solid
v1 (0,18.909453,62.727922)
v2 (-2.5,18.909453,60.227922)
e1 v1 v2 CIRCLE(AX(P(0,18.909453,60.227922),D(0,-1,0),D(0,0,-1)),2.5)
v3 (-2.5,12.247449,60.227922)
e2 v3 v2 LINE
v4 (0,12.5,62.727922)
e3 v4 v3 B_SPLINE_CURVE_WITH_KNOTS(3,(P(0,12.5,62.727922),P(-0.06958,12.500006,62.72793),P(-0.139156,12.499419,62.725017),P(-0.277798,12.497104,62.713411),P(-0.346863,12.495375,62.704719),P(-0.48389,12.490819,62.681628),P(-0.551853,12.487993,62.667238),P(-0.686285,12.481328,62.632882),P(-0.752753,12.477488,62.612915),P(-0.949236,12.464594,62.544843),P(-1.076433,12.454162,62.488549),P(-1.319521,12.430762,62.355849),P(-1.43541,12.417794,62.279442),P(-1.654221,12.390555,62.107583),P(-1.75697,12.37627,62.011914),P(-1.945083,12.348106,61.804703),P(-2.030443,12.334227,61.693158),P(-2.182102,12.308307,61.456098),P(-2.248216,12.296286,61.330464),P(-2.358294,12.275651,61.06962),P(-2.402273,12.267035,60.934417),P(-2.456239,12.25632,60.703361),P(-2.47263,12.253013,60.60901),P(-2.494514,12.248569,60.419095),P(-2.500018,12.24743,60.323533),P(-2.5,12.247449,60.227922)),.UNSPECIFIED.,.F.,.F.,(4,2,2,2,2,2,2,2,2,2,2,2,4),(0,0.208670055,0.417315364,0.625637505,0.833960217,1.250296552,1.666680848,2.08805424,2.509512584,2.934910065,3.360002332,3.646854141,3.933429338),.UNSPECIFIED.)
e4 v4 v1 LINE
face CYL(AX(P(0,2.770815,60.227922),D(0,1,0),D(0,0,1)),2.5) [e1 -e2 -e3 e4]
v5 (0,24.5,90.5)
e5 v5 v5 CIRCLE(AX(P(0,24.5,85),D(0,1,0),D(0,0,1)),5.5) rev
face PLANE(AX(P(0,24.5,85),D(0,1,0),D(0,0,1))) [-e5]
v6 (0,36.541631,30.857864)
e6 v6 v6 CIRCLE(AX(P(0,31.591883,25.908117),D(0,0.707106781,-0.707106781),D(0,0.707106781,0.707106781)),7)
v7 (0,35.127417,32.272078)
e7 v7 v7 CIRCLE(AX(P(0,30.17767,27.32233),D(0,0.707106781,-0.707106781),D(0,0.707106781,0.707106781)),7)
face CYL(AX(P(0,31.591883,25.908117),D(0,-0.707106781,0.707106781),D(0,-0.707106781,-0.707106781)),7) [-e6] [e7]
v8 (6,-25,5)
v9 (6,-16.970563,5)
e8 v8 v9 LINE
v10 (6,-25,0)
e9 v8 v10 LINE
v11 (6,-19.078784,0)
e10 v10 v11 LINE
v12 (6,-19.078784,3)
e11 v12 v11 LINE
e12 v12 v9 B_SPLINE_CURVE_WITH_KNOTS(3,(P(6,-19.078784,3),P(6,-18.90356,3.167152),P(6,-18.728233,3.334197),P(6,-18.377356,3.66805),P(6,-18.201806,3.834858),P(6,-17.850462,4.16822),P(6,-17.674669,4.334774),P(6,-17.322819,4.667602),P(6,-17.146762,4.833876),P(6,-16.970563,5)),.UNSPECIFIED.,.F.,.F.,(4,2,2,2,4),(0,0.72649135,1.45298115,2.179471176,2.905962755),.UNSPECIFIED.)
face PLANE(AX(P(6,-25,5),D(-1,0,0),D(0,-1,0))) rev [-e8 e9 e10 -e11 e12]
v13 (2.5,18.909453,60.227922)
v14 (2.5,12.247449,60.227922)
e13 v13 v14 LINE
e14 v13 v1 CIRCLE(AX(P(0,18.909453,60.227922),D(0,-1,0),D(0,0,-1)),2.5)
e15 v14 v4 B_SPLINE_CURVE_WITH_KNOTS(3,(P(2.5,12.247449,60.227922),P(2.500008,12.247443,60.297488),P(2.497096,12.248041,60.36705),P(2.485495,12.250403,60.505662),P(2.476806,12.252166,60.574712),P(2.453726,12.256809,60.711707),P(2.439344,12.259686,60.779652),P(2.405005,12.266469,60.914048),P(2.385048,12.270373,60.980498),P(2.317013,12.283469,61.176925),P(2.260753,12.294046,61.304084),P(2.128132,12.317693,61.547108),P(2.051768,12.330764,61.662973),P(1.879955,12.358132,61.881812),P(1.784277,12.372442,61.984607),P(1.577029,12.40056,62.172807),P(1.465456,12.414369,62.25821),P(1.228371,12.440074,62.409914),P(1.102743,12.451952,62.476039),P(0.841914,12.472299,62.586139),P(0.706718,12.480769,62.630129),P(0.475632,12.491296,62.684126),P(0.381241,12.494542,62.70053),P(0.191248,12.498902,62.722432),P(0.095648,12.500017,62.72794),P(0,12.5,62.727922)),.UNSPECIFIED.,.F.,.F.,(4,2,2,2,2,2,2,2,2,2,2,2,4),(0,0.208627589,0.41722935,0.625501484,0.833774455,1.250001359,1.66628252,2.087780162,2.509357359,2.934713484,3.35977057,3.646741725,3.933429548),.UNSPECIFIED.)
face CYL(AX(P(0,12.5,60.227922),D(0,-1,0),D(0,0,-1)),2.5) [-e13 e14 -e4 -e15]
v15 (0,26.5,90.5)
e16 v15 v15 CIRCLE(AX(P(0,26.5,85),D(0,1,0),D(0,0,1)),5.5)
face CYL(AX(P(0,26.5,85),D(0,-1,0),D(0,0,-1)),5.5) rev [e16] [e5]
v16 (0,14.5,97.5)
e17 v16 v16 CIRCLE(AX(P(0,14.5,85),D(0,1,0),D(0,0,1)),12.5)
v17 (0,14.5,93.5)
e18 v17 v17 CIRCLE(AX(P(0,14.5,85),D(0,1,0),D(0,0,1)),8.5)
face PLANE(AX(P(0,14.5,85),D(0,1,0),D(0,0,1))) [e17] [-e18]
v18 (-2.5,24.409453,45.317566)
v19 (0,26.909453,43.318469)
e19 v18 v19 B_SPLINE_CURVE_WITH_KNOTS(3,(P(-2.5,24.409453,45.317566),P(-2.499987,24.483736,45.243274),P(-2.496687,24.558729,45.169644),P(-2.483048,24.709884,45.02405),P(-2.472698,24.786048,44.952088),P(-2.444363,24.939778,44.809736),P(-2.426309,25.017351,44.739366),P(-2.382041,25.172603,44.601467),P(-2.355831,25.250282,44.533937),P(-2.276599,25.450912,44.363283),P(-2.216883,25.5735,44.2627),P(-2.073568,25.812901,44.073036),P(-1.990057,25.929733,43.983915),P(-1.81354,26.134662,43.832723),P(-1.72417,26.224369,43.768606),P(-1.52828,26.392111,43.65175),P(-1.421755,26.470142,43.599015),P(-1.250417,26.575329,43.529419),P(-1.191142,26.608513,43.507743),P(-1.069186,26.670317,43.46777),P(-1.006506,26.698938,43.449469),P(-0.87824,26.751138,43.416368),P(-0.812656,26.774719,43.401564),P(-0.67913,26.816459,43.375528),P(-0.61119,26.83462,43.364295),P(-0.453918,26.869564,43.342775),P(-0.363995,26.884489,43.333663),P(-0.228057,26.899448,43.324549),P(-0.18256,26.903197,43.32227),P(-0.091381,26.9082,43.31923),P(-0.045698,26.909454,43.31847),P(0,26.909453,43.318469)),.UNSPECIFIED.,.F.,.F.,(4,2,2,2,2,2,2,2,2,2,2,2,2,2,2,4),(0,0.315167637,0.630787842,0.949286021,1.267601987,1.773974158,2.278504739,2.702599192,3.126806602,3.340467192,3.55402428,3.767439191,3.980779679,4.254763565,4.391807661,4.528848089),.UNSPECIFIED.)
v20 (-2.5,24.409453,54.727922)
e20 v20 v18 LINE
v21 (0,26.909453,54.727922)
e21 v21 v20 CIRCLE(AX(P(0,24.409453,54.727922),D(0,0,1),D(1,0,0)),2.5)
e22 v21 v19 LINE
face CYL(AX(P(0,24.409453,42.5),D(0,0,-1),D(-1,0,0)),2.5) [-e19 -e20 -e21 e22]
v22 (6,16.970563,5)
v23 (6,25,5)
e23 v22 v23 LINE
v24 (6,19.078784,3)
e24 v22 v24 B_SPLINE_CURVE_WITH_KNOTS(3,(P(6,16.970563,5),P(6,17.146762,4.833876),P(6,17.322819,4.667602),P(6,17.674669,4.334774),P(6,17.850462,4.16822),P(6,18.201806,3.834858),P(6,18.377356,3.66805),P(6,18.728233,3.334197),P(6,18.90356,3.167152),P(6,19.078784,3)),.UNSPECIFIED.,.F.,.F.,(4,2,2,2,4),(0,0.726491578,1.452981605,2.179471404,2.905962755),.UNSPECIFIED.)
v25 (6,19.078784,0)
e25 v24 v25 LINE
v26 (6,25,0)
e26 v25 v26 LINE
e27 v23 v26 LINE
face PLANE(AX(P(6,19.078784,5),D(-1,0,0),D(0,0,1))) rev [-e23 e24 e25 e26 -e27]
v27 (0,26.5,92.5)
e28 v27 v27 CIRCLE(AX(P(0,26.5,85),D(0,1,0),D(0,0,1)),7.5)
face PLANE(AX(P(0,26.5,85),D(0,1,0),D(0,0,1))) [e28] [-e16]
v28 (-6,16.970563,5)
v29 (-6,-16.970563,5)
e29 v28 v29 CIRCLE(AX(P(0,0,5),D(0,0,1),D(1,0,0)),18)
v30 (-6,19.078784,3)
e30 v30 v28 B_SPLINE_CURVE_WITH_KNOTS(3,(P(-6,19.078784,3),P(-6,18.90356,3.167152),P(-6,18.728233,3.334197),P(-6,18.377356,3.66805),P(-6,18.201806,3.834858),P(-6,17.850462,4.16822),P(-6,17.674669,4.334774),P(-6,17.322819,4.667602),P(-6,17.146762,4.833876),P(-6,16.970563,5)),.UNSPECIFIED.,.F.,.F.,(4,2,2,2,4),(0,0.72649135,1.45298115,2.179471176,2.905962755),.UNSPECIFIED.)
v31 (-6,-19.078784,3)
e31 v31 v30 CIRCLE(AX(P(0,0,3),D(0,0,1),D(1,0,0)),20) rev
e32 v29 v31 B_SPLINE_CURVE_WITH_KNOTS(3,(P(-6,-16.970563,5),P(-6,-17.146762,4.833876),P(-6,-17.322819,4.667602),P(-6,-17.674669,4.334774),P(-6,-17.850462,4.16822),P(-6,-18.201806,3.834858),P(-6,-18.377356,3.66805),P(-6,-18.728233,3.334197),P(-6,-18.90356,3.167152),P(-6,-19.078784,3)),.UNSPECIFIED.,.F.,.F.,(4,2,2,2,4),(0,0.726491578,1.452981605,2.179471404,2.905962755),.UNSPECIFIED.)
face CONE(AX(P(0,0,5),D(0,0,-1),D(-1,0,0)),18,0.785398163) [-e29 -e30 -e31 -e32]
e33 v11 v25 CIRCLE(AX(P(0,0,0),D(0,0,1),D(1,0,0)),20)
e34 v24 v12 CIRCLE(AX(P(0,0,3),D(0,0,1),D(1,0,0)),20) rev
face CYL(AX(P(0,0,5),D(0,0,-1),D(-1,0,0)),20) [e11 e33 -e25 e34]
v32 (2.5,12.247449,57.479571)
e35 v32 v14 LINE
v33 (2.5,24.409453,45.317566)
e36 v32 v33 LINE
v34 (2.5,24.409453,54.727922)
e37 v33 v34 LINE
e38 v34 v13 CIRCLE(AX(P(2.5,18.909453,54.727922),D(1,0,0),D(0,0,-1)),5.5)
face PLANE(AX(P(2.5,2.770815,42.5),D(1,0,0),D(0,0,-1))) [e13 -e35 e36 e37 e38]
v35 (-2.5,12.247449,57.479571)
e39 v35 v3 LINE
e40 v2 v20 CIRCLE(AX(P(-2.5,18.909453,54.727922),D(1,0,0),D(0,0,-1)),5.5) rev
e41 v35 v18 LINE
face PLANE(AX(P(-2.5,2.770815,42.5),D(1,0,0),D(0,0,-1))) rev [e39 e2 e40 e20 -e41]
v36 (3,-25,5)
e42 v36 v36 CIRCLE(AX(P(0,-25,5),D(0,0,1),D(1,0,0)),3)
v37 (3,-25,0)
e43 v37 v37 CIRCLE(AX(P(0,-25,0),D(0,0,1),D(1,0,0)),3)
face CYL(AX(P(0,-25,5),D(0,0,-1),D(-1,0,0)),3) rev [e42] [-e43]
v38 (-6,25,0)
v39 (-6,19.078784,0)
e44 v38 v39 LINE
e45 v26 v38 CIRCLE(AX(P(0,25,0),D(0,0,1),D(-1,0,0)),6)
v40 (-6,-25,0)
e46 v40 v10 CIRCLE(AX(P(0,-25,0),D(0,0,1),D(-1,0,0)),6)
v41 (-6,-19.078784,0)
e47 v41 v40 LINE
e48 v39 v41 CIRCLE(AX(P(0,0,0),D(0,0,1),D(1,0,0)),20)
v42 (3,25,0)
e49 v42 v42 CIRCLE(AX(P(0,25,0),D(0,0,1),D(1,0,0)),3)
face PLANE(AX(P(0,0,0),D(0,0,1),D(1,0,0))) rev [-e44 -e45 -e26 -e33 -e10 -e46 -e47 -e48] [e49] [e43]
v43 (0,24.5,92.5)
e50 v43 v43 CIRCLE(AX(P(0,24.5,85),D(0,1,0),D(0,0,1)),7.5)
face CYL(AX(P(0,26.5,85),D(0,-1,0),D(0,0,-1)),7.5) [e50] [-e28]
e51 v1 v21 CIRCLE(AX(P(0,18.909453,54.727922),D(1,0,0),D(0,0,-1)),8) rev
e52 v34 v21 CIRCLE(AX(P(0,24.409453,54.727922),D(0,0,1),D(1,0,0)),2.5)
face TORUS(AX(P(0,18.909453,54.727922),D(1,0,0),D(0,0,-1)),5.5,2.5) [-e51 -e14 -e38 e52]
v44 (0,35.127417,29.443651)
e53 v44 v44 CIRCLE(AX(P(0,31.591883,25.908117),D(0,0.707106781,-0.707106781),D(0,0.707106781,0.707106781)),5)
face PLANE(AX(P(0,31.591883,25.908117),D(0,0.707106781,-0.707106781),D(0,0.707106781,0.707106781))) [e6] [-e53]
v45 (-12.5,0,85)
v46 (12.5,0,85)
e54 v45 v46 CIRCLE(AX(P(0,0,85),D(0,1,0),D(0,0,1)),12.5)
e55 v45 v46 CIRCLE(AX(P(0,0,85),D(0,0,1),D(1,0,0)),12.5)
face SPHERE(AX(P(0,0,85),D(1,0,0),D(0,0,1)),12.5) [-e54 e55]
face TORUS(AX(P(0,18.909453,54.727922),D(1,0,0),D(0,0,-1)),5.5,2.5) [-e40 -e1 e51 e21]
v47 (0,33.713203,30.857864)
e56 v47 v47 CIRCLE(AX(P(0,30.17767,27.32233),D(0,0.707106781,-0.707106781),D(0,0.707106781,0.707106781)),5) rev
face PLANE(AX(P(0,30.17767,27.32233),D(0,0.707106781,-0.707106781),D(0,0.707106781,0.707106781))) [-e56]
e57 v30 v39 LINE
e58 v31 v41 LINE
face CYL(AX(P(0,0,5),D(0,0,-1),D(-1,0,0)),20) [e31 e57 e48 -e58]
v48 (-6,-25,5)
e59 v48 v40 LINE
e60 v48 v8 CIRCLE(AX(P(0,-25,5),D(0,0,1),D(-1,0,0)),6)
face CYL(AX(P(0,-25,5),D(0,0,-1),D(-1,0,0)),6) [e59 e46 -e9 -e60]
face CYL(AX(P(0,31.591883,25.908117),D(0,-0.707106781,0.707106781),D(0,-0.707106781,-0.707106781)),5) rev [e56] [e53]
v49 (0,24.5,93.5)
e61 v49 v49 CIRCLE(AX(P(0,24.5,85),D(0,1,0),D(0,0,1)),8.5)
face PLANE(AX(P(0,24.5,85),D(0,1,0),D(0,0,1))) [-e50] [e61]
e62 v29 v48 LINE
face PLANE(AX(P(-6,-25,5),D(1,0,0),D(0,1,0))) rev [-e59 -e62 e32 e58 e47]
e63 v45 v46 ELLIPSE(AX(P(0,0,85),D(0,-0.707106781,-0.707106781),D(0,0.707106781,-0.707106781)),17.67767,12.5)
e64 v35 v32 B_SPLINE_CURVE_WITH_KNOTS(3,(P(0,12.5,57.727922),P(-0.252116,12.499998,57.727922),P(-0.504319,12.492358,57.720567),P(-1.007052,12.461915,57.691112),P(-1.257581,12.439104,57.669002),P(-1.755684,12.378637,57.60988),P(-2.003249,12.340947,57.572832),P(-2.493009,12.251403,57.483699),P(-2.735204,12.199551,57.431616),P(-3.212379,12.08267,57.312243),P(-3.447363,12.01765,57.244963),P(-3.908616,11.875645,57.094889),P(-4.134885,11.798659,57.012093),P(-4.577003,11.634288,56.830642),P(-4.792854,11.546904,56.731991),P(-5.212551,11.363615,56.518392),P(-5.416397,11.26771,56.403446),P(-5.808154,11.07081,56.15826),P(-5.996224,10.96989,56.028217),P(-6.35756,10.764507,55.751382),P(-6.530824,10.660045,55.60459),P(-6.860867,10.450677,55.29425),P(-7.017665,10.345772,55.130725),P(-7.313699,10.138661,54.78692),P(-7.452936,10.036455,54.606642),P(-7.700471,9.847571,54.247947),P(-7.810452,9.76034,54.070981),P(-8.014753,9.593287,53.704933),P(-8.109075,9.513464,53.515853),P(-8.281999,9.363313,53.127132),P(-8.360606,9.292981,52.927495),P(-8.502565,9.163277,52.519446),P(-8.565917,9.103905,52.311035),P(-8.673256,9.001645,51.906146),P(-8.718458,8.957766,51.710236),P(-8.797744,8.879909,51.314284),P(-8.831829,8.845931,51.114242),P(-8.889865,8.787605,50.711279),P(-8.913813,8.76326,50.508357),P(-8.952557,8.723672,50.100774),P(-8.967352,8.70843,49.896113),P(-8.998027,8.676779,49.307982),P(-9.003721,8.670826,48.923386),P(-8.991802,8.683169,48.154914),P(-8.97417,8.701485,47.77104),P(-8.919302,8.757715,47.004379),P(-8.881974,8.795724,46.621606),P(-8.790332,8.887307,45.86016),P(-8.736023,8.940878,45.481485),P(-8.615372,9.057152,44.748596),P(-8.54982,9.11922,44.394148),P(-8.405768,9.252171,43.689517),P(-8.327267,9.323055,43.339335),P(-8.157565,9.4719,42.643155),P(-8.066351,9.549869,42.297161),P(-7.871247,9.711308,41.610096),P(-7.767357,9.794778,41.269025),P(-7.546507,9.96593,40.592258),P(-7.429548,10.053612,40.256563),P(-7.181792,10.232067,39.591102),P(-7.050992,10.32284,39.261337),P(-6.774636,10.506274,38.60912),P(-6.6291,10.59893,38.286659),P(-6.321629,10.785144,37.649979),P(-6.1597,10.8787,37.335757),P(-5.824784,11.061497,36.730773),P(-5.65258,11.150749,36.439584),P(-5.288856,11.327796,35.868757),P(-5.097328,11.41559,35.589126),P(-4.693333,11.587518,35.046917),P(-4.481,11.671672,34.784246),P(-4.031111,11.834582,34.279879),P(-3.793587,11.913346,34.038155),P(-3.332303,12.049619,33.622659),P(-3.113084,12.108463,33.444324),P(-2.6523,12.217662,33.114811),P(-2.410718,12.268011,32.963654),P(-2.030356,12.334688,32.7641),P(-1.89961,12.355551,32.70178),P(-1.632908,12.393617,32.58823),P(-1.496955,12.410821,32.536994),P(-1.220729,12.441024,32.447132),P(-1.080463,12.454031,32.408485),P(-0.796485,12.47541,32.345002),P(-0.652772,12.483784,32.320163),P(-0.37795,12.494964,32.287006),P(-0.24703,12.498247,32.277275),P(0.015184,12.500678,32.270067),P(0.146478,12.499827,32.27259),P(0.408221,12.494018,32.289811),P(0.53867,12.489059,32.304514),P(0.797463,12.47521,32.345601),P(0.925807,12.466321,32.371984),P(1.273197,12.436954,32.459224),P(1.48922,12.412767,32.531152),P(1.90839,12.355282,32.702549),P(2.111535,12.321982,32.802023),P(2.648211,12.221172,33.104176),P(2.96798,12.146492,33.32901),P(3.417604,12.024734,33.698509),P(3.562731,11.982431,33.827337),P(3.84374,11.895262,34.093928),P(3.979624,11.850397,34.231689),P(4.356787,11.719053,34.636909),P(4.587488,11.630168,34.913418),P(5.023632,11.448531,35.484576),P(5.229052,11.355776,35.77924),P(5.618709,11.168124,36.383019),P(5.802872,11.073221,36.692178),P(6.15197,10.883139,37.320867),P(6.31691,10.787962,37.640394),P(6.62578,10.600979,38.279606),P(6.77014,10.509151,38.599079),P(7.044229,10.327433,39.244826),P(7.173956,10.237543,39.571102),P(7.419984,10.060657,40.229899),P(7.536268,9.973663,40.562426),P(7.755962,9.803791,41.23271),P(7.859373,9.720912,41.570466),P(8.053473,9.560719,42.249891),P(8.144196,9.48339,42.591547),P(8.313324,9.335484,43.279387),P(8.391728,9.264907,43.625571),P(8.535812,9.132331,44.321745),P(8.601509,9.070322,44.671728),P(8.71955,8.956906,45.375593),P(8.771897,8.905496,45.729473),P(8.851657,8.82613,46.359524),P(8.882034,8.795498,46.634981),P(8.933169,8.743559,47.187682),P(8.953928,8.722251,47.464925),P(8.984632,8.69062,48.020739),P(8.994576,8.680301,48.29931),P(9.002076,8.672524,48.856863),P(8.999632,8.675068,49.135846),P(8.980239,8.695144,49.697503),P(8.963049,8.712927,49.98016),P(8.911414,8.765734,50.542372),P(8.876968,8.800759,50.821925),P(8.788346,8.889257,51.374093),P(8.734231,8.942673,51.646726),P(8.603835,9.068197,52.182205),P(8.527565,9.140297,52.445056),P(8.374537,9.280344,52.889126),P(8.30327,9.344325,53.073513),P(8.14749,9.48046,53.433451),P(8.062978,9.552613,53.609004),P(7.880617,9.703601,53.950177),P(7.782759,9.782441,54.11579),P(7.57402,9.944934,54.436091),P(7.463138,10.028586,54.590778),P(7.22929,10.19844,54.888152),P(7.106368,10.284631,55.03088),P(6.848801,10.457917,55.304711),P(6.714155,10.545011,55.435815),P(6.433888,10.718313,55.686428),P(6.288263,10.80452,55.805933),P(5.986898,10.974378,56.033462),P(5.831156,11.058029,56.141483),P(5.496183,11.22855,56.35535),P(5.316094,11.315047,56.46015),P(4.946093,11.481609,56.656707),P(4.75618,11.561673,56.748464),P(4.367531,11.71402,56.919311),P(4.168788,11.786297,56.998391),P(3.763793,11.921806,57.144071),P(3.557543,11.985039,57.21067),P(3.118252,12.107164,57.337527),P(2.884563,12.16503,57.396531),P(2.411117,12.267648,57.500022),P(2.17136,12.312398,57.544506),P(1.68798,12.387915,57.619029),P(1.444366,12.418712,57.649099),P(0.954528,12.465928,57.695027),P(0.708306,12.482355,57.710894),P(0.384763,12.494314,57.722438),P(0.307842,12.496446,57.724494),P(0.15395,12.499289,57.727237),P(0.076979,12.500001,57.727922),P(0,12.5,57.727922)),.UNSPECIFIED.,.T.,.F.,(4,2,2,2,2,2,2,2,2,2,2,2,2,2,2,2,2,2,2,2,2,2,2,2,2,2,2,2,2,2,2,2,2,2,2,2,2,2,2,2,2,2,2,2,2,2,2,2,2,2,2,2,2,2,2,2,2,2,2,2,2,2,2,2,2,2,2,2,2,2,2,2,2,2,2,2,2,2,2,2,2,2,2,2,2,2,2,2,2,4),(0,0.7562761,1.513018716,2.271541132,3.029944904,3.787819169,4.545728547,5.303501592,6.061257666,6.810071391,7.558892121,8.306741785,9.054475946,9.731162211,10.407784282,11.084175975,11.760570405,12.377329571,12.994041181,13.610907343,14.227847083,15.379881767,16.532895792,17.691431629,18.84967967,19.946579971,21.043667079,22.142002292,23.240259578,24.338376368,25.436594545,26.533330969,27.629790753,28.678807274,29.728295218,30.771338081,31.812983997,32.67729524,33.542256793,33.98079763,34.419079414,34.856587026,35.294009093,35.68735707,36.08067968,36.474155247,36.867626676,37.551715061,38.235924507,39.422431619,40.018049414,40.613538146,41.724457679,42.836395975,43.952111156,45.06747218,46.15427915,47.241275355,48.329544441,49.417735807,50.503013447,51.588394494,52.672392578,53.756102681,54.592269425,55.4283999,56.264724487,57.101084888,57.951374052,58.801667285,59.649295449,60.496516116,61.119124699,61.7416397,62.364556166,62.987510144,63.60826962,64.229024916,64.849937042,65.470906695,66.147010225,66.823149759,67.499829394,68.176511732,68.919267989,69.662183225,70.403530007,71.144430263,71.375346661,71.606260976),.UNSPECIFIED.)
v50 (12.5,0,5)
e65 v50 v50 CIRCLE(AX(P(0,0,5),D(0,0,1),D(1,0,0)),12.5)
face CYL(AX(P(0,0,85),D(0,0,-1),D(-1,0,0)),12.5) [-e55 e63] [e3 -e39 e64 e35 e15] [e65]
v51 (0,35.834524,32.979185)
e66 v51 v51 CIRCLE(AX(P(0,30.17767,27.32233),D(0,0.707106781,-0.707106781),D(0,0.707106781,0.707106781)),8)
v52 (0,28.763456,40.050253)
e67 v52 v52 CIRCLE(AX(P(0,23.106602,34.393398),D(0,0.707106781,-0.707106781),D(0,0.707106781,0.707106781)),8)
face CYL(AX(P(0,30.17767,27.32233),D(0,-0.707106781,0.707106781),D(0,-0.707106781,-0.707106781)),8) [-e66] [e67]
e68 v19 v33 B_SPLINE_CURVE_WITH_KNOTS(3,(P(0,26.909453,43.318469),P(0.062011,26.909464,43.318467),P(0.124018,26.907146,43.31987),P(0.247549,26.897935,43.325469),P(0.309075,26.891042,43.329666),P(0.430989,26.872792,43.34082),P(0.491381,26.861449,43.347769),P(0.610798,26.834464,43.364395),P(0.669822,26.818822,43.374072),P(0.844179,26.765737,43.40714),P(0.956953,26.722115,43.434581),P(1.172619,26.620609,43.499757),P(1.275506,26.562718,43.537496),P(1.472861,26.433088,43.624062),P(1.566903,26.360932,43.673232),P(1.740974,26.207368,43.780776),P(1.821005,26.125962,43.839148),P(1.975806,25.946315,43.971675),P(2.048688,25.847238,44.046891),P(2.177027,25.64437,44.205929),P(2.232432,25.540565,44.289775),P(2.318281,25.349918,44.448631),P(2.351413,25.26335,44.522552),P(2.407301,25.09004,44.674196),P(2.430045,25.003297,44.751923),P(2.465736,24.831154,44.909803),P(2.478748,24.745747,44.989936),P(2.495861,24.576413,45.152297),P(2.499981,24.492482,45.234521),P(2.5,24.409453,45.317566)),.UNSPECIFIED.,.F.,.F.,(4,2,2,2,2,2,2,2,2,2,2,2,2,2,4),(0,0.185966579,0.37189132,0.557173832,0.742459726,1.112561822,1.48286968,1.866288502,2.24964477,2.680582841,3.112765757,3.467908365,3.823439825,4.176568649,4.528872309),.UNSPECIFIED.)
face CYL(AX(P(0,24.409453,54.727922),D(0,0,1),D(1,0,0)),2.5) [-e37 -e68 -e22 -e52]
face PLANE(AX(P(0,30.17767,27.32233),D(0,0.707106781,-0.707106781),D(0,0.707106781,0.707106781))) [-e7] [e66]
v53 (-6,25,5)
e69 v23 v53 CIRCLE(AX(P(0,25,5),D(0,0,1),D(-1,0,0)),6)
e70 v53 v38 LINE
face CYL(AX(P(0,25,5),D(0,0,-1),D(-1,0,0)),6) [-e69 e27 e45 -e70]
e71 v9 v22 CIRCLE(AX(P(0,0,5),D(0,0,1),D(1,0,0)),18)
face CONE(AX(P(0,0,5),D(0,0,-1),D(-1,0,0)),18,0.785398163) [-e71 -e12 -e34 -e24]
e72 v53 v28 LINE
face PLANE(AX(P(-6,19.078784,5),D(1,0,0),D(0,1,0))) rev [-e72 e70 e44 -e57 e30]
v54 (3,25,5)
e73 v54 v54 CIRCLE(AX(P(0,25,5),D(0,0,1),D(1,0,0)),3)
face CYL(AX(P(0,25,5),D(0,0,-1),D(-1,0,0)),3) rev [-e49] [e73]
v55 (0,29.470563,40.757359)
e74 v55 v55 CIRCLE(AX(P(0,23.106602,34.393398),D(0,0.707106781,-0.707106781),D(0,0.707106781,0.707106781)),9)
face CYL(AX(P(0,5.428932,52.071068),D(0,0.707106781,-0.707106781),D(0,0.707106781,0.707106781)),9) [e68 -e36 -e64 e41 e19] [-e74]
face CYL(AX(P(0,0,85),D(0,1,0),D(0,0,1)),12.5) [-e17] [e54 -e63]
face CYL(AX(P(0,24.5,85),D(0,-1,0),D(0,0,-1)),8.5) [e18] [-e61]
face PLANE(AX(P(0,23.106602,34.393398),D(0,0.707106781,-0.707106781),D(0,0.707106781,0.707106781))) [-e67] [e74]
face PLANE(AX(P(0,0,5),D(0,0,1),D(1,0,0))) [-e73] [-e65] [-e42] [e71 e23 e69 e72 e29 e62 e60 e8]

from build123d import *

# Parameters (mm, degrees)
SZKIC1_R                         = 3
DODANIE_WYCI_GNI_CIE1_DEPTH      = 5
SFAZOWANIE1_SIZE                 = 2
SZKIC2_R                         = 12.5
DODANIE_WYCI_GNI_CIE2_DEPTH      = 80
DODANIE_WYCI_GNI_CIE3_DEPTH      = 15
DODANIE_WYCI_GNI_CIE3_DEPTH_BACK = 10
SZKIC5_R                         = 9
SZKIC6_R                         = 8
DODANIE_WYCI_GNI_CIE4_DEPTH      = 10
SZKIC7_R                         = 7
SZKIC7_R_2                       = 5
DODANIE_WYCI_GNI_CIE5_DEPTH      = 2
EBRO1_START                      = -2.5
EBRO1_DEPTH                      = 5
ZAOKR_GLENIE1_R                  = 2.5
DODANIE_WYCI_GNI_CIE6_DEPTH      = 2
DODANIE_WYCI_GNI_CIE6_DEPTH_BACK = 12.5
SZKIC9_R                         = 12.5
OBR_T1_ANGLE                     = 90
SZKIC11_R                        = 8.5
DODANIE_WYCI_GNI_CIE7_DEPTH      = 10
SZKIC12_R                        = 7.5
SZKIC12_R_2                      = 5.5
DODANIE_WYCI_GNI_CIE8_DEPTH      = 2


# Read off the part's stored shape, not the designer's step: Żebro1
with BuildPart() as part:
    # Szkic1 → Dodanie-wyciągnięcie1 (new body)
    with BuildSketch(Plane.XY):
        with BuildLine():
            Line((6, 19.078784028), (6, 25))
            ThreePointArc((6, 25), (0, 31), (-6, 25))
            Line((-6, 25), (-6, 19.078784028))
            ThreePointArc((-6, 19.078784028), (-20, 0), (-6, -19.078784028))
            Line((-6, -19.078784028), (-6, -25))
            ThreePointArc((-6, -25), (0, -31), (6, -25))
            Line((6, -25), (6, -19.078784028))
            ThreePointArc((6, -19.078784028), (20, 0), (6, 19.078784028))
        make_face()
        with Locations((0, 25)):
            Circle(SZKIC1_R, mode=Mode.SUBTRACT)
        with Locations((0, -25)):
            Circle(SZKIC1_R, mode=Mode.SUBTRACT)
    extrude(amount=DODANIE_WYCI_GNI_CIE1_DEPTH)

    # Sfazowanie1
    sfazowanie1_edges = [part.edges().sort_by_distance(p)[0] for p in [
        (20, 0, 5),
        (-20, 0, 5),
    ]]
    chamfer(sfazowanie1_edges, length=SFAZOWANIE1_SIZE)

    # Szkic2 → Dodanie-wyciągnięcie2 (add)
    with BuildSketch(Plane.XY.offset(5)):
        Circle(SZKIC2_R)
    extrude(amount=DODANIE_WYCI_GNI_CIE2_DEPTH)

    # Szkic5 → Dodanie-wyciągnięcie3 (add, two sides: drawn at the far end of the back side and taken through both)
    with BuildSketch(Plane(origin=(0, 12.5, 45), x_dir=(1, 0, 0), z_dir=(0, 0.7071067811865437, -0.7071067811865515)).offset(-DODANIE_WYCI_GNI_CIE3_DEPTH_BACK)):
        with Locations(Location((0, 0, 0), (0, 0, 270))):
            Circle(SZKIC5_R)
    extrude(amount=DODANIE_WYCI_GNI_CIE3_DEPTH + DODANIE_WYCI_GNI_CIE3_DEPTH_BACK)

    # Szkic6 → Dodanie-wyciągnięcie4 (add)
    with BuildSketch(Plane(origin=(0, -5.643398282, 5.643398282), x_dir=(1, 0, 0), z_dir=(0, 0.7071067811865437, -0.7071067811865513))):
        with Locations(Location((0, -40.658639918, 0), (0, 0, 270))):
            Circle(SZKIC6_R)
    extrude(amount=DODANIE_WYCI_GNI_CIE4_DEPTH)

    # Szkic7 → Dodanie-wyciągnięcie5 (add)
    with BuildSketch(Plane(origin=(0, 1.42766953, -1.42766953), x_dir=(1, 0, 0), z_dir=(0, 0.7071067811865437, -0.7071067811865515))):
        with Locations(Location((0, -40.658639918, 0), (0, 0, 270))):
            Circle(SZKIC7_R)
        with Locations(Location((0, -40.658639918, 0), (0, 0, 270))):
            Circle(SZKIC7_R_2, mode=Mode.SUBTRACT)
    extrude(amount=DODANIE_WYCI_GNI_CIE5_DEPTH)

    # Żebro1 outline → Żebro1 (add)
    with BuildSketch(Plane(origin=(0, 0, 0), x_dir=(0, 0, -1), z_dir=(1, 0, 0)).offset(EBRO1_START)):
        with BuildLine():
            Line((-62.727922061, 18.909453225), (-62.727922061, 12))
            Line((-62.727922061, 12), (-42, 12))
            Line((-42, 12), (-42, 26.909453225))
            Line((-42, 26.909453225), (-54.727922061, 26.909453225))
            ThreePointArc((-54.727922061, 26.909453225), (-60.384776311, 24.566307475), (-62.727922061, 18.909453225))
        make_face()
    extrude(amount=EBRO1_DEPTH)

    # Zaokrąglenie1
    zaokr_glenie1_edges = [part.edges().sort_by_distance(p)[0] for p in [
        (-2.5, 15.578450969, 62.727922061),
        (-2.5, 26.909453225, 48.772744048),
        (2.5, 15.578450969, 62.727922061),
        (2.5, 24.566307475, 60.384776311),
        (-2.5, 24.566307475, 60.384776311),
        (2.5, 26.909453225, 48.772744048),
    ]]
    fillet(zaokr_glenie1_edges, radius=ZAOKR_GLENIE1_R - 0.0001)  # a hair under: the kernel refuses the full size

    # Szkic9 → Dodanie-wyciągnięcie6 (add, two sides: drawn at the far end of the back side and taken through both)
    with BuildSketch(Plane(origin=(0, 12.5, 0), x_dir=(1, 0, 0), z_dir=(0, 1, 0)).offset(-DODANIE_WYCI_GNI_CIE6_DEPTH_BACK)):
        with Locations(Location((0, -85, 0), (0, 0, 270))):
            Circle(SZKIC9_R)
    extrude(amount=DODANIE_WYCI_GNI_CIE6_DEPTH + DODANIE_WYCI_GNI_CIE6_DEPTH_BACK)

    # Szkic10 → Obrót1 (revolve)
    with BuildSketch(Plane.XY.offset(85)):
        with BuildLine():
            Line((-12.5, 0), (12.5, 0))
            ThreePointArc((12.5, 0), (0, -12.5), (-12.5, 0))
        make_face()
    revolve(axis=Axis((-12.5, 0, 85), (-1, 0, 0)), revolution_arc=OBR_T1_ANGLE)

    # Szkic11 → Dodanie-wyciągnięcie7 (add)
    with BuildSketch(Plane(origin=(0, 14.5, 0), x_dir=(1, 0, 0), z_dir=(0, 1, 0))):
        with Locations(Location((0, -85, 0), (0, 0, 270))):
            Circle(SZKIC11_R)
    extrude(amount=DODANIE_WYCI_GNI_CIE7_DEPTH)

    # Szkic12 → Dodanie-wyciągnięcie8 (add)
    with BuildSketch(Plane(origin=(0, 24.5, 0), x_dir=(1, 0, 0), z_dir=(0, 1, 0))):
        with Locations(Location((0, -85, 0), (0, 0, 270))):
            Circle(SZKIC12_R)
        with Locations(Location((0, -85, 0), (0, 0, 270))):
            Circle(SZKIC12_R_2, mode=Mode.SUBTRACT)
    extrude(amount=DODANIE_WYCI_GNI_CIE8_DEPTH)


solid = part.part
